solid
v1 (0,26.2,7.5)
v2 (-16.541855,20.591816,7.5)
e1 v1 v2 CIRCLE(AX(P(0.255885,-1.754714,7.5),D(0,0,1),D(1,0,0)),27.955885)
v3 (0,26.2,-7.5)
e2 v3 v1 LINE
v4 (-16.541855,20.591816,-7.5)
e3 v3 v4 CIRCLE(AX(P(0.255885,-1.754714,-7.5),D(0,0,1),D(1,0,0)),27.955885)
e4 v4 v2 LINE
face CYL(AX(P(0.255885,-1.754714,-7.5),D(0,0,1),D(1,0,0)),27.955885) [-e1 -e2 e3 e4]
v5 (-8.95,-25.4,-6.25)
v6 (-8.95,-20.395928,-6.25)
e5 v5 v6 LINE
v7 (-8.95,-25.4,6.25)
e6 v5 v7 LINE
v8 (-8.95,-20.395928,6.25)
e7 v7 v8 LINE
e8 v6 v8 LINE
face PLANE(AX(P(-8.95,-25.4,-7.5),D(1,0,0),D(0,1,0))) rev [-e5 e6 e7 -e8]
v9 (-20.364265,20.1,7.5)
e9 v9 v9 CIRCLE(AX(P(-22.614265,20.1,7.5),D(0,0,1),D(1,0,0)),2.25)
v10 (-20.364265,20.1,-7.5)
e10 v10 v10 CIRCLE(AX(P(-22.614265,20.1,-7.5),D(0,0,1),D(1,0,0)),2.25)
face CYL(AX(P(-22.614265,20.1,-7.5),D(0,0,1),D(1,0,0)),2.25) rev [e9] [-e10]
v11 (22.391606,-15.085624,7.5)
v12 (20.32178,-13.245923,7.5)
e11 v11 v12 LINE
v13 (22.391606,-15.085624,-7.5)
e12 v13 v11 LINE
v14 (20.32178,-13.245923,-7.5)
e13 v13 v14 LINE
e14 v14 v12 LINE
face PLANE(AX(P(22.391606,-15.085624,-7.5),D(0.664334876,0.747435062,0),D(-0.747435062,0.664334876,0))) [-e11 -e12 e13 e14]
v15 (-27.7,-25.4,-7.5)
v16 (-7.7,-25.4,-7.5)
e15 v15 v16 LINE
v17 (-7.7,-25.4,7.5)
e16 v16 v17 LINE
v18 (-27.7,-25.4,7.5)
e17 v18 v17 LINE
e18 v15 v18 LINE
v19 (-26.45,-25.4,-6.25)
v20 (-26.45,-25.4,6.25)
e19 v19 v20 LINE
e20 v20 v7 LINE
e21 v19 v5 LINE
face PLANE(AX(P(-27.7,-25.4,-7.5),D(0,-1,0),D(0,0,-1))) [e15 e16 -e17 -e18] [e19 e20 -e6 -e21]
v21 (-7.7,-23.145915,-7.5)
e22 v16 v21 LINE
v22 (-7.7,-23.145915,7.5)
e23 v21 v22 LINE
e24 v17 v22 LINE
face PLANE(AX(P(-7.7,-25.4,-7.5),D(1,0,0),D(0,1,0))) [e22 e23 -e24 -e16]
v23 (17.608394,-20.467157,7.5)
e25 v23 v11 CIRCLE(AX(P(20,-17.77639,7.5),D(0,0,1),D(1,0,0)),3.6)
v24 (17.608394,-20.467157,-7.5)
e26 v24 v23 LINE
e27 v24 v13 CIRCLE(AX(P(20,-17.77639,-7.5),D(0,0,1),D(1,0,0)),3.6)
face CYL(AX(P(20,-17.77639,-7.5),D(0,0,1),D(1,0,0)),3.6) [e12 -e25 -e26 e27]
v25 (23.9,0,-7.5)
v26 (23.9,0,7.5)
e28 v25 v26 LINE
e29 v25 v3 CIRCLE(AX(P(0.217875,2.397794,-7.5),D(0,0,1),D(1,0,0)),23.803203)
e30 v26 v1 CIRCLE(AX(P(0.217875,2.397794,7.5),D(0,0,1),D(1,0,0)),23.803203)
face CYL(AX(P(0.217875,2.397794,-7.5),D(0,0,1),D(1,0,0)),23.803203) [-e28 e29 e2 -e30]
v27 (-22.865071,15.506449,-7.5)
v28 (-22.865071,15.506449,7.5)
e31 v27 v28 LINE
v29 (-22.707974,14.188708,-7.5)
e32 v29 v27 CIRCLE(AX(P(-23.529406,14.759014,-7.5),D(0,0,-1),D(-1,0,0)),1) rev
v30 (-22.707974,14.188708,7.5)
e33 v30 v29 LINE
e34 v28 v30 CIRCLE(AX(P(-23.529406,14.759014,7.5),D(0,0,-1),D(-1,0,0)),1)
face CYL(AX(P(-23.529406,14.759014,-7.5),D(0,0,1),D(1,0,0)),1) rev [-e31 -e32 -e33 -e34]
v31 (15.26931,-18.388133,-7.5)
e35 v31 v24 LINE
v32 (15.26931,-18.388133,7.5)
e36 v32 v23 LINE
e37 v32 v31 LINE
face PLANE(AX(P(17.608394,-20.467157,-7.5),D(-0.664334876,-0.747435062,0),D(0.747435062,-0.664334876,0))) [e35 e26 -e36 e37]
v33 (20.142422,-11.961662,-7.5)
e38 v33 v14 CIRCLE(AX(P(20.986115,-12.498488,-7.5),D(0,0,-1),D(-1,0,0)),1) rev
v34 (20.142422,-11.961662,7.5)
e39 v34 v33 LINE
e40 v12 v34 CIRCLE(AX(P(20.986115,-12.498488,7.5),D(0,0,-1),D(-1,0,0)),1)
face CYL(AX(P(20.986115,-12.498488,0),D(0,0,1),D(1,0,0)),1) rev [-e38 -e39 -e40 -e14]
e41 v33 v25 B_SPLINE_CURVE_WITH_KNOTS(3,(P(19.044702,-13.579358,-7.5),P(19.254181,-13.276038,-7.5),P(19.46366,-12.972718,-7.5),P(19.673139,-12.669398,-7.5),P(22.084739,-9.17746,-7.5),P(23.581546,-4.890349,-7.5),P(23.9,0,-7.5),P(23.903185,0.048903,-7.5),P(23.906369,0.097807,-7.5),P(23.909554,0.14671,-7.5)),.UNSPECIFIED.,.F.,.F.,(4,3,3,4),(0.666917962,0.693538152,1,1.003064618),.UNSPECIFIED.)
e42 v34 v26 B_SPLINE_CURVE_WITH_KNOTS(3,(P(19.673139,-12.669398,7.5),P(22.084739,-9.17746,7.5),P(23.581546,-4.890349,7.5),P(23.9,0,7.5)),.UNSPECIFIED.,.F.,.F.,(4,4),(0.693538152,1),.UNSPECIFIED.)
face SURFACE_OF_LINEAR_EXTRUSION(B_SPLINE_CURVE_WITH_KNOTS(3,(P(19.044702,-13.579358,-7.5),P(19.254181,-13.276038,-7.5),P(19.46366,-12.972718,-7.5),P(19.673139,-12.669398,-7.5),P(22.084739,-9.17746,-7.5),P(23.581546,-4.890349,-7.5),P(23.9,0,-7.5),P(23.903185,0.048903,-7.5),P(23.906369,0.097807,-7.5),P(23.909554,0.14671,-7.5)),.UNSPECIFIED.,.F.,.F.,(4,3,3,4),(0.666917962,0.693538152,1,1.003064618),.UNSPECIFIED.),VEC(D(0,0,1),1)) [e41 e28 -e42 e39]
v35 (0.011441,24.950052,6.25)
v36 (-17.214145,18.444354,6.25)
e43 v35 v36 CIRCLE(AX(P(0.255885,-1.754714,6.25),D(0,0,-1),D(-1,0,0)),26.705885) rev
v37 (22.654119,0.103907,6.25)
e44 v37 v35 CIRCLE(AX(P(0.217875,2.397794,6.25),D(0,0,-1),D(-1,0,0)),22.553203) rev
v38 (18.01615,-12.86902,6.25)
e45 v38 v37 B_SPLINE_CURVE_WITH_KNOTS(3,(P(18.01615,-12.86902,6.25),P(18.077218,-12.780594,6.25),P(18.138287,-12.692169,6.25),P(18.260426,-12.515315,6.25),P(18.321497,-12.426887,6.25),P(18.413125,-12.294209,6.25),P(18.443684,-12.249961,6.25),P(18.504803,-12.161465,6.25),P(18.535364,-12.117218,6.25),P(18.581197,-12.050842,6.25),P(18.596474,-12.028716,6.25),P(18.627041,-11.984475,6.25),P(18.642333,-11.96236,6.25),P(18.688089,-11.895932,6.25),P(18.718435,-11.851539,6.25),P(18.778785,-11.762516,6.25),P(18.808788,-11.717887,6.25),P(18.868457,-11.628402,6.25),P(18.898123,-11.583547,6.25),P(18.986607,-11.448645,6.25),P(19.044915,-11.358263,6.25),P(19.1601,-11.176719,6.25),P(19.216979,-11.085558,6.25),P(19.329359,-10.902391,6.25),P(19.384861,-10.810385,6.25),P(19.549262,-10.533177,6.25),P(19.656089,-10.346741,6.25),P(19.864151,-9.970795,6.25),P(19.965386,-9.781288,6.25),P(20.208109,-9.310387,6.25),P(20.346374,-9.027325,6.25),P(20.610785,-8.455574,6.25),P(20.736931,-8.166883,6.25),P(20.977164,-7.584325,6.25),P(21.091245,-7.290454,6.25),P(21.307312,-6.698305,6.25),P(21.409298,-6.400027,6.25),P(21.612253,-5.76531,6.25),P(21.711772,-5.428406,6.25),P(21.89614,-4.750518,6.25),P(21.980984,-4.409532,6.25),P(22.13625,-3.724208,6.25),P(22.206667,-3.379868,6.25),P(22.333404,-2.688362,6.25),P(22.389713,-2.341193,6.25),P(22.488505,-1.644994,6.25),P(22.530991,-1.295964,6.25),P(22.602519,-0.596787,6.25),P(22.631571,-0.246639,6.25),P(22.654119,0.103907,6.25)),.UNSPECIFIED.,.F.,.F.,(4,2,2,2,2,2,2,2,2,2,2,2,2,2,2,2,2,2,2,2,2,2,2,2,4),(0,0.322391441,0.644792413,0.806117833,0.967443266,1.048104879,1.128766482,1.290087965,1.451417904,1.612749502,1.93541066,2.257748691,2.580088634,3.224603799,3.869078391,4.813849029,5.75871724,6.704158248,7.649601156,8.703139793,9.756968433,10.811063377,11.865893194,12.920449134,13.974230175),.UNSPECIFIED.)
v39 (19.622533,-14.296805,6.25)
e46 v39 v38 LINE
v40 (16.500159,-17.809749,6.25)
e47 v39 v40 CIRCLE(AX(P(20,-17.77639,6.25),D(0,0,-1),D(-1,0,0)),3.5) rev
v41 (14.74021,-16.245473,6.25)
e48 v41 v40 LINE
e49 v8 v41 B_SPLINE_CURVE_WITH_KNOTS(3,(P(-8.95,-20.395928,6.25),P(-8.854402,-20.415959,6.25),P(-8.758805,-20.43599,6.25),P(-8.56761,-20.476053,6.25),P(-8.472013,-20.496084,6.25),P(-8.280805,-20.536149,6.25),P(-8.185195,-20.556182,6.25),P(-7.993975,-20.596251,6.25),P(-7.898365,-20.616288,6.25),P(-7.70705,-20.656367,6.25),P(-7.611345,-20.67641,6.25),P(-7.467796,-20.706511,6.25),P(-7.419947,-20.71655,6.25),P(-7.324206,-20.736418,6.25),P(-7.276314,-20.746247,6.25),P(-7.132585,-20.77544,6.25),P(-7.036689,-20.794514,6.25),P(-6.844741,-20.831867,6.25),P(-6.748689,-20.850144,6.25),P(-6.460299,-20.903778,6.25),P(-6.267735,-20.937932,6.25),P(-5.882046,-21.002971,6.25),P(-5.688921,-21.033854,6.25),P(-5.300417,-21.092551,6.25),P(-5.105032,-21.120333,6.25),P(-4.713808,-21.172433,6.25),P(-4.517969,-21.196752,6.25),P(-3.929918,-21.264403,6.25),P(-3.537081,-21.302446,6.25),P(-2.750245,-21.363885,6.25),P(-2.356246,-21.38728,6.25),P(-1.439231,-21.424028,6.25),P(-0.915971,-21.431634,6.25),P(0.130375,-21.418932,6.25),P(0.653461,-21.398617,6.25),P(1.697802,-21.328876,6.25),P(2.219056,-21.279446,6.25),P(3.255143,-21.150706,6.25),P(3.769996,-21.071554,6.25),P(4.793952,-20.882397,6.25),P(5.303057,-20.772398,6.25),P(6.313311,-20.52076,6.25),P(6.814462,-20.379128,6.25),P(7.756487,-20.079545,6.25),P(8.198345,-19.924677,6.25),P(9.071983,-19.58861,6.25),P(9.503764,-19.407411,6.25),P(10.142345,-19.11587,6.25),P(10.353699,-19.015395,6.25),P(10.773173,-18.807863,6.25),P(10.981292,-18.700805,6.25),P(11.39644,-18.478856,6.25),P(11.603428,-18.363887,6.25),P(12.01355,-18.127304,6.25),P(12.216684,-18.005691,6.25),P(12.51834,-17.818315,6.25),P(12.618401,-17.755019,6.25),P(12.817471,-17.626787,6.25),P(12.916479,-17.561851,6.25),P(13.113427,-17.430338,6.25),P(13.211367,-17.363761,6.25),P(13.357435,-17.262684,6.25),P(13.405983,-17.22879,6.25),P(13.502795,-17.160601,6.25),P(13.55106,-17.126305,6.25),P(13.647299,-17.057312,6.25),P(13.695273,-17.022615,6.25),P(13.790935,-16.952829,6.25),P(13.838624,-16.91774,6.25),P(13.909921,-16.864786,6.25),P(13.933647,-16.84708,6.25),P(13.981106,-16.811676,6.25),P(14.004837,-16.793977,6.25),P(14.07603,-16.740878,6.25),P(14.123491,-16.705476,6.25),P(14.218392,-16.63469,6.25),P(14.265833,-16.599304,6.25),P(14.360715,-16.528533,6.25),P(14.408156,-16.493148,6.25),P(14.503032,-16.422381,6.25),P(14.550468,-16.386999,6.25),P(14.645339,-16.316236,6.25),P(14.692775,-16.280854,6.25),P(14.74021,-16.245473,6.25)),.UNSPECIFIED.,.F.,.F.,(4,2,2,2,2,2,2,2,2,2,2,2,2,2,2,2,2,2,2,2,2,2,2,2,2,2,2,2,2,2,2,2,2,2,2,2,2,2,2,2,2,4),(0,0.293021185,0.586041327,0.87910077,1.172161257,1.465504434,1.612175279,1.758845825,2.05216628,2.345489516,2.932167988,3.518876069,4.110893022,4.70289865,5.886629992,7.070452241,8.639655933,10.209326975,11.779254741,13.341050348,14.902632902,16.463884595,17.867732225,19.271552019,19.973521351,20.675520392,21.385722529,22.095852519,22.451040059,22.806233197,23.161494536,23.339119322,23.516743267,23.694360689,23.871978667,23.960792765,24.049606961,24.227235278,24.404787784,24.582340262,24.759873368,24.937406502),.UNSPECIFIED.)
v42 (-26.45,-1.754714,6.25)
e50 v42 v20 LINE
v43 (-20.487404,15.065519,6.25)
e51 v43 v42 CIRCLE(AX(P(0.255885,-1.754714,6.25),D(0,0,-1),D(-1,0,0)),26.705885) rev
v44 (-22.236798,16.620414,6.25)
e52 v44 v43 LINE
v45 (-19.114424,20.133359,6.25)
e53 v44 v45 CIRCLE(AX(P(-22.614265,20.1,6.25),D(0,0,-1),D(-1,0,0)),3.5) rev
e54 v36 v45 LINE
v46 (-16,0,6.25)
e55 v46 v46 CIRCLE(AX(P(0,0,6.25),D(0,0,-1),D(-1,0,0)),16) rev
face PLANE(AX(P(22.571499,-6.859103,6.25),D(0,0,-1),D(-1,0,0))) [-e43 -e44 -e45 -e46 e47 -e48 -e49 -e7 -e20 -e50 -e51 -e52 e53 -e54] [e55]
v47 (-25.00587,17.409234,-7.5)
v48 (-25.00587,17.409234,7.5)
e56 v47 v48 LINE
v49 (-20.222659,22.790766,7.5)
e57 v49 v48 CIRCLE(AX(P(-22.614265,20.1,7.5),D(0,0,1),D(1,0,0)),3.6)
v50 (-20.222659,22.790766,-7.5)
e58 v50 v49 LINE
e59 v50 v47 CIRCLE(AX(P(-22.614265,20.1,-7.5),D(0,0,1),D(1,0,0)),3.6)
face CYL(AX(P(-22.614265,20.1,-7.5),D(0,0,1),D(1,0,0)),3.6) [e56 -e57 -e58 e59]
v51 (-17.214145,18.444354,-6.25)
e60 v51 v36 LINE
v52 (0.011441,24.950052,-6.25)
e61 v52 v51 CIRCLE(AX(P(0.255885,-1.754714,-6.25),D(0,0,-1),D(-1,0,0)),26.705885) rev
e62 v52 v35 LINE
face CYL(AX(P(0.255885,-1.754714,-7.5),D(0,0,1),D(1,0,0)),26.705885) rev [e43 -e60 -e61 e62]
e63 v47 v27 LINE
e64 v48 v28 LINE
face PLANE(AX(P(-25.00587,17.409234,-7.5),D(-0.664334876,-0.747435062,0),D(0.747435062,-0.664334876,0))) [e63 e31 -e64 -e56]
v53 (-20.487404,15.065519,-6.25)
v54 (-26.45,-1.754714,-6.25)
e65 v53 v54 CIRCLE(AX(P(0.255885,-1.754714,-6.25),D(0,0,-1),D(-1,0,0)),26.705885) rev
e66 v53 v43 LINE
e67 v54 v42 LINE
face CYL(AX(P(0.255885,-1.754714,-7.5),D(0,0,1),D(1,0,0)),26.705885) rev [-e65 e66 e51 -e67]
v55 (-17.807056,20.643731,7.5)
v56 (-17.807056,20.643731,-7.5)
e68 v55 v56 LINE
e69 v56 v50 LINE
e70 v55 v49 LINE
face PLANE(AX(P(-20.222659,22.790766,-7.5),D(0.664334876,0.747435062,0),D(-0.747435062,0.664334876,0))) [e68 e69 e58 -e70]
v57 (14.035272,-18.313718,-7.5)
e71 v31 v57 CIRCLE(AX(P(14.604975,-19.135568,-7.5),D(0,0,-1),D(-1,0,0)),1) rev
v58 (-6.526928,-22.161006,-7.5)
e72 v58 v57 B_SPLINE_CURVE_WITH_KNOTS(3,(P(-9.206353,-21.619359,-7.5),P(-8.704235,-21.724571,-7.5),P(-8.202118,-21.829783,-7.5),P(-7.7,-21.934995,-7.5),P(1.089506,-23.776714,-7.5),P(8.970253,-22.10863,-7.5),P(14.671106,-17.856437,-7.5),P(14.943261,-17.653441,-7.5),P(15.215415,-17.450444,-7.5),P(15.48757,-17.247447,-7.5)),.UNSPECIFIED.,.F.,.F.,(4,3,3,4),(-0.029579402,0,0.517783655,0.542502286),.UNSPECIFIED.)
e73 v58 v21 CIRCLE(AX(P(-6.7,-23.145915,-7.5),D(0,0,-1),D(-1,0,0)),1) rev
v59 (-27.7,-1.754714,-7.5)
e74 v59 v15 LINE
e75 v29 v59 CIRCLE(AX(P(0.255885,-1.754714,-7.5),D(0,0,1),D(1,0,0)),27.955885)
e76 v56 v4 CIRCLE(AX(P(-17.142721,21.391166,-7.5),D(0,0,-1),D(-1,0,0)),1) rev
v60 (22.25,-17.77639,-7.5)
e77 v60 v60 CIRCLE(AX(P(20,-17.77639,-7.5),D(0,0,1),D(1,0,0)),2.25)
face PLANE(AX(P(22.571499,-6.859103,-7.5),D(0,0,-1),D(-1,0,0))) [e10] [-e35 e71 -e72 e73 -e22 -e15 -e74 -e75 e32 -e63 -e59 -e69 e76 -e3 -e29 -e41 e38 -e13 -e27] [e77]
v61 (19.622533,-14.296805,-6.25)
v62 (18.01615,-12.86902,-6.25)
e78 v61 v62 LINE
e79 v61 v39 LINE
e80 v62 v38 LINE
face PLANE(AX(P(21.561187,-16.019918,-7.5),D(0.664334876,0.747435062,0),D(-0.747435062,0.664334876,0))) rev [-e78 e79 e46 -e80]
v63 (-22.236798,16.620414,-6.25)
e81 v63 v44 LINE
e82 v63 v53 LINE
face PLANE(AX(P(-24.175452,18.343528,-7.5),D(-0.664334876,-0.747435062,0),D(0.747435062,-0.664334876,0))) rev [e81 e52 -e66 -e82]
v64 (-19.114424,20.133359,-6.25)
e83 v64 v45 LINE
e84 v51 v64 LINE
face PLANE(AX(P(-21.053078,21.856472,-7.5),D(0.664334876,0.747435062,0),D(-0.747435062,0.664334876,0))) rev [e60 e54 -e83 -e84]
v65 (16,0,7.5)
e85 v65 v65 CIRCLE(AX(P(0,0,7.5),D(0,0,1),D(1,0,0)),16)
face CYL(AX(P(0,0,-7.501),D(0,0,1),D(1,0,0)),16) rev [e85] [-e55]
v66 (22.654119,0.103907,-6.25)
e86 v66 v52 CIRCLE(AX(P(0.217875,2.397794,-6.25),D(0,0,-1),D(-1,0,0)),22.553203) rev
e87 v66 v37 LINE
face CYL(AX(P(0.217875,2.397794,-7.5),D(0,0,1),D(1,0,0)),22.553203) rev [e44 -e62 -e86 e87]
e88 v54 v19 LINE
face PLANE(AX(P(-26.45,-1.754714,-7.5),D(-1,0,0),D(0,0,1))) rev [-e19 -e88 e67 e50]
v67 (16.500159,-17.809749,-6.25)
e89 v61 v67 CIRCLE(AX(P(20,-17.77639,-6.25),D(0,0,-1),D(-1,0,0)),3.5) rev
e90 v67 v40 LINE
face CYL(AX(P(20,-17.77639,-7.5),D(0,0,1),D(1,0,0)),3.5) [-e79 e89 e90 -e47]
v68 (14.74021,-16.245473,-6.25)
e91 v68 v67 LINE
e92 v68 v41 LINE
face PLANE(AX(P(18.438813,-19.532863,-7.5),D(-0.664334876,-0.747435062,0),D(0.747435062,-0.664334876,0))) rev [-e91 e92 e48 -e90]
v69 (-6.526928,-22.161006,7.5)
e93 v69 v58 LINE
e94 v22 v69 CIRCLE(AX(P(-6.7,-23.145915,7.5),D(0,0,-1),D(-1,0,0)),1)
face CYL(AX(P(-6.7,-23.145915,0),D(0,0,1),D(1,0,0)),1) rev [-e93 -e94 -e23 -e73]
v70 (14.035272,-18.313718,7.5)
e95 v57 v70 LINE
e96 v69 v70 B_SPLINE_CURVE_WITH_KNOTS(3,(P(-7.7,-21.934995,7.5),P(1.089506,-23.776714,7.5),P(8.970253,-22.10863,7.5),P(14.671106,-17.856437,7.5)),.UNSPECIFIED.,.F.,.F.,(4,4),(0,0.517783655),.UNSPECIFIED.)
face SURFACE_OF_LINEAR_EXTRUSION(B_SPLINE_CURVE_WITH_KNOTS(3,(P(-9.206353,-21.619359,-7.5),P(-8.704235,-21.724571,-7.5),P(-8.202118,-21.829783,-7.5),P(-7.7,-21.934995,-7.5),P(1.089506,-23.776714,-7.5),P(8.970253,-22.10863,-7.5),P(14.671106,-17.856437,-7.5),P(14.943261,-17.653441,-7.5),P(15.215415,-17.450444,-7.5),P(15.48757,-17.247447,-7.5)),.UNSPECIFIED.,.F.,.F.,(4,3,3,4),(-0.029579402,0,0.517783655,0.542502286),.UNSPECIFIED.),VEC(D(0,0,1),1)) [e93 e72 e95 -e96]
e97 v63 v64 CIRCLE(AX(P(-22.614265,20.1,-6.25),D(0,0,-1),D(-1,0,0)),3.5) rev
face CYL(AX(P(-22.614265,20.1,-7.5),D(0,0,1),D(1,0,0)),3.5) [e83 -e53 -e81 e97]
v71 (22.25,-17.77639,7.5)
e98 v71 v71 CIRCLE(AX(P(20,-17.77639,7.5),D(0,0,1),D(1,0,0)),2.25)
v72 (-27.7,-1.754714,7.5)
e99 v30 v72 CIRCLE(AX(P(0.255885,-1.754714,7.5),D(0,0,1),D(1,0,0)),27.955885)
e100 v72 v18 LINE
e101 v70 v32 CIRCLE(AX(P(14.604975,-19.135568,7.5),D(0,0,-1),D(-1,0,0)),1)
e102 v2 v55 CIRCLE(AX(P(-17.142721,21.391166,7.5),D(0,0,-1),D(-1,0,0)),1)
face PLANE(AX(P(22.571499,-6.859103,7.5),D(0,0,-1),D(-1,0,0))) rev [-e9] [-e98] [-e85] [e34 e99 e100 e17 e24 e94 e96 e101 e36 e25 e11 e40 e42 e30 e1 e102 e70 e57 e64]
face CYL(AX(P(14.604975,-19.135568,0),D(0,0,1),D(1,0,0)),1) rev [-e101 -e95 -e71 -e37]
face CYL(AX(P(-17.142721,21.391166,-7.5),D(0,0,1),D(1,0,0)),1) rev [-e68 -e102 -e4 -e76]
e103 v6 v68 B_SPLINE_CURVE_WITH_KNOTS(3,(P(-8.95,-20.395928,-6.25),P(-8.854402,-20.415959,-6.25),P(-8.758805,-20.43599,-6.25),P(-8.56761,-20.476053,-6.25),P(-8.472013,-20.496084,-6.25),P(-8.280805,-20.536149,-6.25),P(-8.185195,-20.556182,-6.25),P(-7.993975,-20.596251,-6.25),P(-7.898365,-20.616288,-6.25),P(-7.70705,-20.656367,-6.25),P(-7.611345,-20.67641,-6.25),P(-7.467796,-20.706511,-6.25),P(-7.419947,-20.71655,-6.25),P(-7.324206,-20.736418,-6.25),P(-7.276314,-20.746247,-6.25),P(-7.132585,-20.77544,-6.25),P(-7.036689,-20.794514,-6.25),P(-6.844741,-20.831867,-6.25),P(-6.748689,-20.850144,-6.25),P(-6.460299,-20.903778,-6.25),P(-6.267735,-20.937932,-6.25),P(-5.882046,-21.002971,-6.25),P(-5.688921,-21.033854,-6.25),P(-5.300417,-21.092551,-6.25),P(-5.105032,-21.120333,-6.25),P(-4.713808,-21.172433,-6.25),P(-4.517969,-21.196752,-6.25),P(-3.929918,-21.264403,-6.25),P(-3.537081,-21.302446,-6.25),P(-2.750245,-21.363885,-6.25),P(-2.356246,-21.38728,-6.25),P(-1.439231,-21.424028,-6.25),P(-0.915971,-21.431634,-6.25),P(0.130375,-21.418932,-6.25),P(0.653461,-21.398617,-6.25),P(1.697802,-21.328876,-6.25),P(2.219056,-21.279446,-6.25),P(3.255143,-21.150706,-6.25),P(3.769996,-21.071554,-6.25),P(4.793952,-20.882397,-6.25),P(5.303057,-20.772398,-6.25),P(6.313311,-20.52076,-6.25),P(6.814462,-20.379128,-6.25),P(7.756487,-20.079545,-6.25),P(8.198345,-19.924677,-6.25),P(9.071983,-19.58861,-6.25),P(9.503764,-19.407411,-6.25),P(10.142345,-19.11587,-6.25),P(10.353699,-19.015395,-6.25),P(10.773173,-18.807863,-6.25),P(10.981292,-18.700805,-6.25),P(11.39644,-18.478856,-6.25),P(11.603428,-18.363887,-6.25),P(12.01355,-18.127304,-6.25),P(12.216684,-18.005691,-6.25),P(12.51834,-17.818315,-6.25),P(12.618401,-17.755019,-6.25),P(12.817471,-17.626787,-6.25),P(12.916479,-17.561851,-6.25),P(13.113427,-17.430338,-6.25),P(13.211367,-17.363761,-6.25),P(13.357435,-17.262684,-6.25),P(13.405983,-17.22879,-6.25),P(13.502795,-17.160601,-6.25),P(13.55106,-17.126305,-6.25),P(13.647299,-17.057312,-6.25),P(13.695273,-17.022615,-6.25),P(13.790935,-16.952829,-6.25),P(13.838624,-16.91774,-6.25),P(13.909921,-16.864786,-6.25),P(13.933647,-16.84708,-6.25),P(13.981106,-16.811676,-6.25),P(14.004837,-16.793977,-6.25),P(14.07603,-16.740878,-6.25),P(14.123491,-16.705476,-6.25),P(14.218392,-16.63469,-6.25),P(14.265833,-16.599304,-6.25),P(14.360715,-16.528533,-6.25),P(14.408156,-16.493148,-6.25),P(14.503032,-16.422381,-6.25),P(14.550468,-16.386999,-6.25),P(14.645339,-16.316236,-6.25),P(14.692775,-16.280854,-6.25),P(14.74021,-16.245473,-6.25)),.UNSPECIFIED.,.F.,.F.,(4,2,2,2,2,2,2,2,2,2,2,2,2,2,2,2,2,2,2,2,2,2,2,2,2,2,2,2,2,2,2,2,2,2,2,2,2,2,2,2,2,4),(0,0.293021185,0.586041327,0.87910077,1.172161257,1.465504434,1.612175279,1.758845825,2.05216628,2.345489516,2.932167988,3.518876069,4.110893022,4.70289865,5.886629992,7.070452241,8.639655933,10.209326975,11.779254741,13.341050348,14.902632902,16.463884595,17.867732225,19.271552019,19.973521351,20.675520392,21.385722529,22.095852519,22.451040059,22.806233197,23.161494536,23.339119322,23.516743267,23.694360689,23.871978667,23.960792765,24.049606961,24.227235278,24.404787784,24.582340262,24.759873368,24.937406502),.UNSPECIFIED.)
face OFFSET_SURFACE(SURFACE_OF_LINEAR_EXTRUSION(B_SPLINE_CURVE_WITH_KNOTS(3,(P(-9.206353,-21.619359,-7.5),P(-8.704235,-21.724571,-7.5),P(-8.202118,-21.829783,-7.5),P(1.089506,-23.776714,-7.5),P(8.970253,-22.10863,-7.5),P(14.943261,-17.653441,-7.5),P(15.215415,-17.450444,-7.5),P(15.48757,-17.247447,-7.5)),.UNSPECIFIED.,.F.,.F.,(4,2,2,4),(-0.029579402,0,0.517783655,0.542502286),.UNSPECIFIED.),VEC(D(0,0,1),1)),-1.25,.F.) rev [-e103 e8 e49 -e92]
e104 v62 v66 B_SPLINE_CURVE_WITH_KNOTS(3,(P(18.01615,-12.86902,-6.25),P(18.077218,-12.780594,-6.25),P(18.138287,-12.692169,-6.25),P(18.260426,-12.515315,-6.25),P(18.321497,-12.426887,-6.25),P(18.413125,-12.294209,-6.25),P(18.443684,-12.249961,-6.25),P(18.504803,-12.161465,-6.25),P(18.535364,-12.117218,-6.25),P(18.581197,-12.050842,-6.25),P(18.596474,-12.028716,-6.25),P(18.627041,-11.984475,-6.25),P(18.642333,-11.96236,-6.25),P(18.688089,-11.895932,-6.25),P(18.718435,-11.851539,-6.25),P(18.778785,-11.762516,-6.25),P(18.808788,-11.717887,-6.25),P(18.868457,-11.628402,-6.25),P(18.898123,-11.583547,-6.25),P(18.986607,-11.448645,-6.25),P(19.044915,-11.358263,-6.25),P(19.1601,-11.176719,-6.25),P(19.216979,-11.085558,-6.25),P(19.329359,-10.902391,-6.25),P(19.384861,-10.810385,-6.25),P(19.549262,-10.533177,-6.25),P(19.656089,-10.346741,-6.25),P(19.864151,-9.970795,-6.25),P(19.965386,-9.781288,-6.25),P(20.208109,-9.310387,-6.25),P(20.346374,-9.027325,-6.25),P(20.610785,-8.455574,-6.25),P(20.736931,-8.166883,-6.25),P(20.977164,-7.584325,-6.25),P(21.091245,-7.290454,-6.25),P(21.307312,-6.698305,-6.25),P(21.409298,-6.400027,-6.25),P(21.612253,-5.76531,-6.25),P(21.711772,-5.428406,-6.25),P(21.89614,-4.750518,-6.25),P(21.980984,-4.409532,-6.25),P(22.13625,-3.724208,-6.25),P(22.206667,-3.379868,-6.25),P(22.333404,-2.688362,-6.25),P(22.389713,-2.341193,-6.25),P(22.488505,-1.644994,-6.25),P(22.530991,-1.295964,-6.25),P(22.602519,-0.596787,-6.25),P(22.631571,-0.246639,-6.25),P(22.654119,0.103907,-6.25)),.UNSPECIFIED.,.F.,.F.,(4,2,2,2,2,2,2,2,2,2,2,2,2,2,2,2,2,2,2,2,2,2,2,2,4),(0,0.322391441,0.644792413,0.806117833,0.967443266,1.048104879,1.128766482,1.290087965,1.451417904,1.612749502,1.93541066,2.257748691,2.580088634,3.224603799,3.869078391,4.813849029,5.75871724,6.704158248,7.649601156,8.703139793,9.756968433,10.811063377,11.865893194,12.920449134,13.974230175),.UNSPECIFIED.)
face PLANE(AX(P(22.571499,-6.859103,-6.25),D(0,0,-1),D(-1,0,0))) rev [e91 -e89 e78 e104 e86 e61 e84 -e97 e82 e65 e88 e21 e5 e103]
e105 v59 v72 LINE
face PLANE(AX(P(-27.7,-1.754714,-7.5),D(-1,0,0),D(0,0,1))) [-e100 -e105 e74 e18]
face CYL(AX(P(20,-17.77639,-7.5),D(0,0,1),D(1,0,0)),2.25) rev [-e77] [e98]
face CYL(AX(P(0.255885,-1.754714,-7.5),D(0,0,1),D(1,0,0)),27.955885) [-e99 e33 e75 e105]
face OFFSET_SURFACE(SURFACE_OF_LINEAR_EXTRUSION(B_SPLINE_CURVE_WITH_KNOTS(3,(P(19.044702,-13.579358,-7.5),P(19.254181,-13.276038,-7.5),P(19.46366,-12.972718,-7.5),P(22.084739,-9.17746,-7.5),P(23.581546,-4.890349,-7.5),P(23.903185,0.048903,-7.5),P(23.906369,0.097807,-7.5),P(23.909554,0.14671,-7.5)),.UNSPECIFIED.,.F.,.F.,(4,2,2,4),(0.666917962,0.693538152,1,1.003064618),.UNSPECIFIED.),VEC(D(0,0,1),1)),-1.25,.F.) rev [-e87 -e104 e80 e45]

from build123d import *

# Parameters (mm, degrees)
BOSS_EXTRUDE1_DEPTH      = 7.5
BOSS_EXTRUDE1_DEPTH_BACK = 7.5
SKETCH2_R                = 2.25
SHELL1_START             = -6.25
SHELL1_DEPTH             = 12.5
CUT_EXTRUDE1_REACH       = 42.973
SKETCH3_R                = 16
FILLET1_R                = 1


# Read off the part's stored shape, not the designer's step: Shell1
with BuildPart() as part:
    # Sketch2 → Boss-Extrude1 (new, two sides: drawn at the far end of the back side and taken through both)
    with BuildSketch(Plane.XY.offset(-BOSS_EXTRUDE1_DEPTH_BACK)):
        with BuildLine():
            Line((-27.7, -1.754714302), (-27.7, -25.4))
            Line((-27.7, -25.4), (-7.7, -25.4))
            Line((-7.7, -25.4), (-7.7, -21.934994614))
            add(Edge.make_bspline(
                [(-7.7, -21.934994614), (1.089505829, -23.776714198), (8.970252681, -22.10862964), (14.671105933, -17.856437337)],
                knots=[0, 0, 0, 0, 0.517783655, 0.517783655, 0.517783655, 0.517783655], degree=3))
            Line((14.671105933, -17.856437337), (17.608394445, -20.467156716))
            ThreePointArc((17.608394445, -20.467156716), (22.690766223, -20.167996048), (22.391605555, -15.085624269))
            Line((22.391605555, -15.085624269), (19.673138844, -12.669397979))
            add(Edge.make_bspline(
                [(19.673138844, -12.669397979), (22.084739228, -9.177460006), (23.581545529, -4.890349215), (23.9, 0)],
                knots=[0.693538152, 0.693538152, 0.693538152, 0.693538152, 1, 1, 1, 1], degree=3))
            ThreePointArc((23.9, 0), (17.803458828, 18.439605572), (0, 26.2))
            ThreePointArc((0, 26.2), (-9.105433904, 24.587214818), (-17.186614263, 20.092270255))
            Line((-17.186614263, 20.092270255), (-20.222659144, 22.790766223))
            ThreePointArc((-20.222659144, 22.790766223), (-25.305030923, 22.491605555), (-25.005870255, 17.409233777))
            Line((-25.005870255, 17.409233777), (-22.191609365, 14.907863751))
            ThreePointArc((-22.191609365, 14.907863751), (-26.28720334, 7.020020377), (-27.7, -1.754714302))
        make_face()
        with Locations((20, -17.776390493)):
            Circle(SKETCH2_R, mode=Mode.SUBTRACT)
        with Locations((-22.6142647, 20.1)):
            Circle(SKETCH2_R, mode=Mode.SUBTRACT)
    extrude(amount=BOSS_EXTRUDE1_DEPTH + BOSS_EXTRUDE1_DEPTH_BACK)

    # Shell1 outline → Shell1 (cut)
    with BuildSketch(Plane.XY.offset(SHELL1_START)):
        with BuildLine():
            Line((19.622532896, -14.296804513), (18.016150224, -12.869020231))
            add(Edge.make_bspline(
                [(18.016150224, -12.869020231), (18.051576945, -12.817723211), (18.087003667, -12.766426191), (18.122430388, -12.715129171), (18.157857109, -12.66383215), (18.193283831, -12.612535131), (18.228710551, -12.56123811), (18.264137274, -12.50994109), (18.299563994, -12.45864407), (18.334990716, -12.40734705), (18.370417437, -12.35605003), (18.405844159, -12.30475301), (18.44127088, -12.25345599), (18.476697601, -12.20215897), (18.520981003, -12.138037694), (18.529837683, -12.125213439), (18.538694363, -12.112389184), (18.547551044, -12.099564929), (18.556407724, -12.086740674), (18.565264404, -12.073916419), (18.574121085, -12.061092164), (18.582977765, -12.048267909), (18.591834446, -12.035443654), (18.600691126, -12.022619399), (18.609547806, -12.009795144), (18.618404486, -11.996970889), (18.627261167, -11.984146634), (18.636671389, -11.970520863), (18.637224932, -11.969719347), (18.637778474, -11.968917831), (18.638332017, -11.968116315), (18.638885559, -11.967314799), (18.639439102, -11.966513284), (18.639992644, -11.965711767), (18.640546187, -11.964910252), (18.64109973, -11.964108735), (18.641653272, -11.96330722), (18.642206815, -11.962505704), (18.642760357, -11.961704188), (18.6433139, -11.960902672), (18.643936635, -11.960000966), (18.644007721, -11.959898036), (18.644065014, -11.959815075), (18.644167659, -11.959666454), (18.644187428, -11.959637822), (18.644283855, -11.9594982), (18.644383013, -11.959354625), (18.644395371, -11.959336729), (18.644469199, -11.959229822), (18.644608909, -11.959027533), (18.644602592, -11.959036679), (18.644696049, -11.958901353), (18.644756897, -11.958813245), (18.644887565, -11.958624032), (18.644952899, -11.958529425), (18.645018233, -11.958434817), (18.645083566, -11.958340209), (18.645148897, -11.958245601), (18.64521423, -11.958150993), (18.64527956, -11.958056383), (18.645344892, -11.957961774), (18.645410222, -11.957867163), (18.645475552, -11.957772553), (18.645540881, -11.957677942), (18.64560621, -11.957583331), (18.645671538, -11.957488719), (18.645867521, -11.957204882), (18.645998175, -11.957015655), (18.646128827, -11.956826427), (18.646259476, -11.956637197), (18.646390124, -11.956447965), (18.646520768, -11.956258731), (18.646651413, -11.956069496), (18.646782053, -11.955880258), (18.646912693, -11.95569102), (18.64704333, -11.955501779), (18.647173965, -11.955312536), (18.647304598, -11.955123292), (18.64743523, -11.954934045), (18.647827117, -11.954366301), (18.648088368, -11.953987798), (18.64834961, -11.953609287), (18.648610844, -11.95323077), (18.648872069, -11.952852245), (18.649133288, -11.952473713), (18.649394497, -11.952095174), (18.649655699, -11.951716627), (18.649916892, -11.951338074), (18.650178078, -11.950959513), (18.650439255, -11.950580945), (18.650700424, -11.95020237), (18.650961585, -11.949823787), (18.65226735, -11.947930839), (18.653311833, -11.946416366), (18.654356185, -11.944901777), (18.655400408, -11.943387074), (18.656444501, -11.941872255), (18.657488465, -11.940357322), (18.658532298, -11.938842273), (18.659576002, -11.937327109), (18.660619576, -11.93581183), (18.661663021, -11.934296437), (18.662706335, -11.932780928), (18.66374952, -11.931265304), (18.664792575, -11.929749565), (18.667921351, -11.925202003), (18.670006683, -11.922169835), (18.672091495, -11.919137207), (18.674175788, -11.916104119), (18.676259561, -11.913070571), (18.678342816, -11.910036563), (18.680425551, -11.907002096), (18.682507767, -11.903967167), (18.684589463, -11.90093178), (18.68667064, -11.897895932), (18.688751296, -11.894859625), (18.690831434, -11.891822858), (18.692911052, -11.888785631), (18.699148345, -11.879672571), (18.703304462, -11.873595358), (18.7074585, -11.867516307), (18.711610458, -11.861435418), (18.715760335, -11.85535269), (18.719908132, -11.849268125), (18.724053848, -11.843181721), (18.728197483, -11.83709348), (18.732339035, -11.831003402), (18.736478506, -11.824911486), (18.740615894, -11.818817734), (18.744751199, -11.812722145), (18.748884421, -11.80662472), (18.769540109, -11.776128414), (18.786031319, -11.751701992), (18.802489161, -11.727246206), (18.818913609, -11.702761073), (18.835304639, -11.678246607), (18.851662221, -11.653702823), (18.867986333, -11.629129738), (18.884276945, -11.604527363), (18.900534033, -11.579895716), (18.91675757, -11.555234811), (18.932947531, -11.530544664), (18.949103888, -11.505825288), (18.965226617, -11.4810767), (19.04567198, -11.357187769), (19.10948985, -11.25760948), (19.172767579, -11.157564989), (19.235503448, -11.057055241), (19.297695737, -10.956081176), (19.359342728, -10.85464374), (19.420442701, -10.752743874), (19.480993936, -10.650382523), (19.540994714, -10.547560629), (19.600443315, -10.444279135), (19.659338021, -10.340538985), (19.717677112, -10.236341121), (19.775458869, -10.131686486), (19.947126977, -9.816355101), (20.059335888, -9.604310842), (20.16929426, -9.390450666), (20.276987945, -9.174781998), (20.382402688, -8.957312267), (20.485524131, -8.738048908), (20.586337811, -8.516999358), (20.684829159, -8.294171063), (20.780983502, -8.06957147), (20.874786063, -7.843208033), (20.966221959, -7.61508821), (21.055276202, -7.385219464), (21.1419337, -7.153609263), (21.310424813, -6.686920896), (21.392258464, -6.45184282), (21.471664997, -6.215038335), (21.548629109, -5.976514973), (21.623135411, -5.736280308), (21.695168429, -5.494341964), (21.764712594, -5.250707611), (21.831752262, -5.005384963), (21.896271688, -4.758381783), (21.958255052, -4.50970588), (22.017686437, -4.259365107), (22.074549845, -4.007367366), (22.128829187, -3.753720604), (22.20634784, -3.370788921), (22.231537383, -3.242734734), (22.256074879, -3.114271279), (22.279958285, -2.985399584), (22.30318556, -2.856120672), (22.325754665, -2.726435571), (22.347663554, -2.596345306), (22.368910193, -2.465850903), (22.389492535, -2.334953386), (22.409408542, -2.203653784), (22.428656171, -2.07195312), (22.447233383, -1.939852421), (22.465138135, -1.807352712), (22.490983513, -1.608006173), (22.499430005, -1.54145784), (22.507707606, -1.474810151), (22.515816054, -1.408063241), (22.523755093, -1.341217241), (22.531524462, -1.274272285), (22.539123905, -1.207228504), (22.546553159, -1.140086033), (22.553811969, -1.072845002), (22.560900073, -1.005505546), (22.567817215, -0.938067797), (22.574563135, -0.870531887), (22.581137573, -0.80289795), (22.590741621, -0.701300201), (22.593900035, -0.667409811), (22.597015481, -0.633494965), (22.600087926, -0.59955568), (22.603117338, -0.565591972), (22.606103685, -0.531603859), (22.609046934, -0.497591356), (22.611947051, -0.463554482), (22.614804006, -0.429493253), (22.617617765, -0.395407686), (22.620388296, -0.361297797), (22.623115565, -0.327163604), (22.625799541, -0.293005124), (22.629760517, -0.241730997), (22.63107001, -0.224633554), (22.632368668, -0.207530045), (22.633656487, -0.190420473), (22.63493346, -0.17330484), (22.636199589, -0.156183147), (22.637454861, -0.139055398), (22.638699282, -0.121921594), (22.639932839, -0.104781737), (22.641155535, -0.087635829), (22.64236736, -0.070483873), (22.643568315, -0.053325871), (22.644758392, -0.036161825), (22.646232388, -0.014699214), (22.646526508, -0.010406314), (22.646819947, -0.006113037), (22.647112705, -0.001819382), (22.647404785, 0.00247465), (22.647696182, 0.00676906), (22.647986902, 0.011063848), (22.648276938, 0.015359013), (22.648566297, 0.019654555), (22.648854972, 0.023950474), (22.649142969, 0.028246771), (22.649430284, 0.032543446), (22.649716919, 0.036840497), (22.65014585, 0.04328664), (22.650288657, 0.045435449), (22.650431293, 0.047584352), (22.65057376, 0.049733349), (22.650716055, 0.051882441), (22.650858182, 0.054031626), (22.651000137, 0.056180907), (22.651141923, 0.058330281), (22.651283537, 0.06047975), (22.651424983, 0.062629313), (22.651566257, 0.06477897), (22.651707361, 0.066928721), (22.651848295, 0.069078567), (22.65202425, 0.071765992), (22.65205943, 0.072303483), (22.6520946, 0.07284098), (22.652129759, 0.073378482), (22.652164908, 0.073915991), (22.652200045, 0.074453505), (22.652235173, 0.074991026), (22.652270288, 0.075528552), (22.652305395, 0.076066084), (22.652340489, 0.076603622), (22.652375574, 0.077141166), (22.652410648, 0.077678716), (22.652445711, 0.078216272), (22.652489527, 0.078888224), (22.652498289, 0.079022614), (22.652507051, 0.079157006), (22.652515812, 0.079291397), (22.652524573, 0.079425789), (22.652533332, 0.079560181), (22.652542092, 0.079694574), (22.65255085, 0.079828967), (22.652559608, 0.07996336), (22.652568365, 0.080097754), (22.652577122, 0.080232148), (22.652585877, 0.080366542), (22.652594633, 0.080500937), (22.652612142, 0.080769727), (22.652621626, 0.080915337), (22.652624364, 0.080957354), (22.652656726, 0.081454433), (22.652609826, 0.080733725), (22.652702072, 0.08215146), (22.652629159, 0.081030098), (22.652694632, 0.082037175), (22.652676876, 0.081763348), (22.65269448, 0.082034275), (22.652702142, 0.082151727), (22.652711317, 0.082292672), (22.652720479, 0.08243336), (22.65274789, 0.082854297), (22.652766164, 0.083134921), (22.652784438, 0.083415546), (22.652802712, 0.08369617), (22.652820985, 0.083976794), (22.652839261, 0.084257419), (22.652857533, 0.084538043), (22.652875809, 0.084818668), (22.652894081, 0.085099292), (22.652912356, 0.085379917), (22.652930629, 0.085660541), (22.652948904, 0.085941166), (22.652967178, 0.08622179), (22.653058548, 0.087624912), (22.653131643, 0.08874741), (22.653204739, 0.089869908), (22.653277835, 0.090992406), (22.653350932, 0.092114904), (22.653424026, 0.093237402), (22.653497124, 0.094359899), (22.653570218, 0.095482397), (22.653643315, 0.096604895), (22.65371641, 0.097727393), (22.653789507, 0.098849891), (22.653862602, 0.099972389), (22.653935698, 0.101094887), (22.654016655, 0.102338098), (22.654024516, 0.102458811), (22.654032376, 0.102579524), (22.654040237, 0.102700237), (22.654048098, 0.10282095), (22.654055958, 0.102941663), (22.654063819, 0.103062376), (22.65407168, 0.103183089), (22.654079541, 0.103303803), (22.654087401, 0.103424516), (22.654095262, 0.103545229), (22.654103123, 0.103665942), (22.654110983, 0.103786655), (22.654118844, 0.103907368)],
                knots=[0.666917962, 0.666917962, 0.666917962, 0.666917962, 0.666917962, 0.666917962, 0.666917962, 0.666917962, 0.666917962, 0.666917962, 0.666917962, 0.666917962, 0.666917962, 0.666917962, 0.666917962, 0.687927128, 0.687927128, 0.687927128, 0.687927128, 0.687927128, 0.687927128, 0.687927128, 0.687927128, 0.687927128, 0.687927128, 0.687927128, 0.687927128, 0.687927128, 0.693179419, 0.693179419, 0.693179419, 0.693179419, 0.693179419, 0.693179419, 0.693179419, 0.693179419, 0.693179419, 0.693179419, 0.693179419, 0.693179419, 0.693179419, 0.693507688, 0.693507688, 0.693507688, 0.693507688, 0.693507688, 0.693507688, 0.693507688, 0.693507688, 0.693507688, 0.693507688, 0.693507688, 0.693507688, 0.693507688, 0.693548721, 0.693548721, 0.693548721, 0.693548721, 0.693548721, 0.693548721, 0.693548721, 0.693548721, 0.693548721, 0.693548721, 0.693548721, 0.693548721, 0.693548721, 0.693589755, 0.693589755, 0.693589755, 0.693589755, 0.693589755, 0.693589755, 0.693589755, 0.693589755, 0.693589755, 0.693589755, 0.693589755, 0.693589755, 0.693589755, 0.693671822, 0.693671822, 0.693671822, 0.693671822, 0.693671822, 0.693671822, 0.693671822, 0.693671822, 0.693671822, 0.693671822, 0.693671822, 0.693671822, 0.693671822, 0.693835956, 0.693835956, 0.693835956, 0.693835956, 0.693835956, 0.693835956, 0.693835956, 0.693835956, 0.693835956, 0.693835956, 0.693835956, 0.693835956, 0.693835956, 0.694492492, 0.694492492, 0.694492492, 0.694492492, 0.694492492, 0.694492492, 0.694492492, 0.694492492, 0.694492492, 0.694492492, 0.694492492, 0.694492492, 0.694492492, 0.695805565, 0.695805565, 0.695805565, 0.695805565, 0.695805565, 0.695805565, 0.695805565, 0.695805565, 0.695805565, 0.695805565, 0.695805565, 0.695805565, 0.695805565, 0.698431711, 0.698431711, 0.698431711, 0.698431711, 0.698431711, 0.698431711, 0.698431711, 0.698431711, 0.698431711, 0.698431711, 0.698431711, 0.698431711, 0.698431711, 0.708936294, 0.708936294, 0.708936294, 0.708936294, 0.708936294, 0.708936294, 0.708936294, 0.708936294, 0.708936294, 0.708936294, 0.708936294, 0.708936294, 0.708936294, 0.750954626, 0.750954626, 0.750954626, 0.750954626, 0.750954626, 0.750954626, 0.750954626, 0.750954626, 0.750954626, 0.750954626, 0.750954626, 0.750954626, 0.750954626, 0.83499129, 0.83499129, 0.83499129, 0.83499129, 0.83499129, 0.83499129, 0.83499129, 0.83499129, 0.83499129, 0.83499129, 0.83499129, 0.83499129, 0.83499129, 0.919027954, 0.919027954, 0.919027954, 0.919027954, 0.919027954, 0.919027954, 0.919027954, 0.919027954, 0.919027954, 0.919027954, 0.919027954, 0.919027954, 0.919027954, 0.961046286, 0.961046286, 0.961046286, 0.961046286, 0.961046286, 0.961046286, 0.961046286, 0.961046286, 0.961046286, 0.961046286, 0.961046286, 0.961046286, 0.961046286, 0.982055452, 0.982055452, 0.982055452, 0.982055452, 0.982055452, 0.982055452, 0.982055452, 0.982055452, 0.982055452, 0.982055452, 0.982055452, 0.982055452, 0.982055452, 0.992560035, 0.992560035, 0.992560035, 0.992560035, 0.992560035, 0.992560035, 0.992560035, 0.992560035, 0.992560035, 0.992560035, 0.992560035, 0.992560035, 0.992560035, 0.997812327, 0.997812327, 0.997812327, 0.997812327, 0.997812327, 0.997812327, 0.997812327, 0.997812327, 0.997812327, 0.997812327, 0.997812327, 0.997812327, 0.997812327, 0.9991254, 0.9991254, 0.9991254, 0.9991254, 0.9991254, 0.9991254, 0.9991254, 0.9991254, 0.9991254, 0.9991254, 0.9991254, 0.9991254, 0.9991254, 0.999781936, 0.999781936, 0.999781936, 0.999781936, 0.999781936, 0.999781936, 0.999781936, 0.999781936, 0.999781936, 0.999781936, 0.999781936, 0.999781936, 0.999781936, 0.99994607, 0.99994607, 0.99994607, 0.99994607, 0.99994607, 0.99994607, 0.99994607, 0.99994607, 0.99994607, 0.99994607, 0.99994607, 0.99994607, 0.99994607, 0.999987104, 0.999987104, 0.999987104, 0.999987104, 0.999987104, 0.999987104, 0.999987104, 0.999987104, 0.999987104, 0.999987104, 0.999987104, 0.999987104, 0.999987104, 1.000028137, 1.000028137, 1.000028137, 1.000028137, 1.000028137, 1.000028137, 1.000028137, 1.000028137, 1.000028137, 1.000028137, 1.000028137, 1.000028137, 1.000028137, 1.000110205, 1.000110205, 1.000110205, 1.000110205, 1.000110205, 1.000110205, 1.000110205, 1.000110205, 1.000110205, 1.000110205, 1.000110205, 1.000110205, 1.000110205, 1.000438473, 1.000438473, 1.000438473, 1.000438473, 1.000438473, 1.000438473, 1.000438473, 1.000438473, 1.000438473, 1.000438473, 1.000438473, 1.000438473, 1.000438473, 1.000473775, 1.000473775, 1.000473775, 1.000473775, 1.000473775, 1.000473775, 1.000473775, 1.000473775, 1.000473775, 1.000473775, 1.000473775, 1.000473775, 1.000473775, 1.000473775, 1.000473775], degree=14))
            ThreePointArc((22.654118844, 0.103907368), (16.887423541, 17.589012543), (0.011441482, 24.950052364))
            ThreePointArc((0.011441482, 24.950052364), (-9.179774467, 23.228732983), (-17.214144884, 18.44435392))
            Line((-17.214144884, 18.44435392), (-19.114423676, 20.133358812))
            ThreePointArc((-19.114423676, 20.133358812), (-19.998241983, 17.774827932), (-22.236797596, 16.620414021))
            Line((-22.236797596, 16.620414021), (-20.48740424, 15.06551905))
            ThreePointArc((-20.48740424, 15.06551905), (-24.915251155, 7.168188788), (-26.45, -1.754714302))
            Line((-26.45, -1.754714302), (-26.45, -25.4))
            Line((-26.45, -25.4), (-8.95, -25.4))
            Line((-8.95, -25.4), (-8.95, -20.395928254))
            add(Edge.make_bspline(
                [(-8.95, -20.395928254), (-8.879967103, -20.41060268), (-8.809934206, -20.425277107), (-8.739901309, -20.439951533), (-8.669868412, -20.45462596), (-8.599835515, -20.469300386), (-8.529802618, -20.483974813), (-8.459769721, -20.498649239), (-8.389736824, -20.513323666), (-8.319703927, -20.527998093), (-8.24967103, -20.542672519), (-8.179638133, -20.557346946), (-8.109605236, -20.572021373), (-8.00455589, -20.594033012), (-7.969539442, -20.601370226), (-7.934522993, -20.608707439), (-7.899506544, -20.616044652), (-7.864490096, -20.623381866), (-7.829473647, -20.630719079), (-7.794457199, -20.638056292), (-7.75944075, -20.645393505), (-7.724424302, -20.652730719), (-7.689407853, -20.660067932), (-7.654391405, -20.667405145), (-7.619374956, -20.674742359), (-7.575604396, -20.683913875), (-7.566850284, -20.685748179), (-7.558096171, -20.687582482), (-7.549342059, -20.689416785), (-7.540587947, -20.691251089), (-7.531833835, -20.693085392), (-7.523079723, -20.694919695), (-7.514325611, -20.696753999), (-7.505571499, -20.698588302), (-7.496817387, -20.700422605), (-7.488063274, -20.702256908), (-7.479309162, -20.704091212), (-7.469460786, -20.706154803), (-7.468366522, -20.706384091), (-7.467272258, -20.706613379), (-7.466177994, -20.706842667), (-7.46508373, -20.707071955), (-7.463989466, -20.707301243), (-7.462895202, -20.707530531), (-7.461800938, -20.707759818), (-7.460706674, -20.707989106), (-7.45961241, -20.708218394), (-7.458518146, -20.708447682), (-7.457423882, -20.70867697), (-7.455782486, -20.709020902), (-7.455235354, -20.709135546), (-7.454688222, -20.70925019), (-7.45414109, -20.709364834), (-7.453593958, -20.709479478), (-7.453046826, -20.709594122), (-7.452499694, -20.709708766), (-7.451952562, -20.70982341), (-7.45140543, -20.709938054), (-7.450858298, -20.710052698), (-7.450311166, -20.710167342), (-7.449764034, -20.710281986), (-7.448943336, -20.710453951), (-7.44866977, -20.710511273), (-7.448396204, -20.710568595), (-7.448122638, -20.710625917), (-7.447849072, -20.710683239), (-7.447575506, -20.710740561), (-7.44730194, -20.710797883), (-7.447028374, -20.710855205), (-7.446754808, -20.710912527), (-7.446481242, -20.710969849), (-7.446207676, -20.711027171), (-7.44593411, -20.711084493), (-7.445523761, -20.711170476), (-7.445386978, -20.711199137), (-7.445250195, -20.711227798), (-7.445113412, -20.711256459), (-7.444976629, -20.71128512), (-7.444839846, -20.711313781), (-7.444703063, -20.711342442), (-7.44456628, -20.711371103), (-7.444429497, -20.711399764), (-7.444292714, -20.711428425), (-7.444155931, -20.711457086), (-7.444019148, -20.711485747), (-7.443745582, -20.711543069), (-7.443605589, -20.711572403), (-7.443475817, -20.711599595), (-7.443347829, -20.711626412), (-7.443215786, -20.711654079), (-7.44308089, -20.711682342), (-7.442947139, -20.711710365), (-7.442816245, -20.711737789), (-7.44268608, -20.71176506), (-7.442553546, -20.711792827), (-7.44241929, -20.711820953), (-7.442288176, -20.711848421), (-7.440040957, -20.712319196), (-7.437925972, -20.712762124), (-7.43581103, -20.713204901), (-7.433696133, -20.713647524), (-7.431581279, -20.714089994), (-7.42946647, -20.714532312), (-7.427351704, -20.714974476), (-7.425236983, -20.715416488), (-7.423122306, -20.715858347), (-7.421007673, -20.716300053), (-7.418893084, -20.716741607), (-7.41677854, -20.717183007), (-7.410435038, -20.71850675), (-7.406206213, -20.719388634), (-7.401977564, -20.720269907), (-7.397749093, -20.721150569), (-7.393520797, -20.722030619), (-7.389292679, -20.722910059), (-7.385064737, -20.723788887), (-7.380836972, -20.724667105), (-7.376609384, -20.725544711), (-7.372381972, -20.726421706), (-7.368154737, -20.727298091), (-7.36392768, -20.728173864), (-7.342793275, -20.732549677), (-7.325888583, -20.736040554), (-7.308986725, -20.739521659), (-7.292087703, -20.742992996), (-7.27519152, -20.746454565), (-7.25829818, -20.749906371), (-7.241407684, -20.753348414), (-7.224520036, -20.756780698), (-7.207635238, -20.760203225), (-7.190753293, -20.763615997), (-7.173874204, -20.767019017), (-7.156997974, -20.770412287), (-7.005137653, -20.800863985), (-6.870333839, -20.827308309), (-6.735714564, -20.853129997), (-6.601281224, -20.878330267), (-6.467035219, -20.902910335), (-6.332977948, -20.926871418), (-6.199110809, -20.950214732), (-6.065435201, -20.972941495), (-5.931952523, -20.995052923), (-5.798664173, -21.016550234), (-5.665571549, -21.037434643), (-5.532676052, -21.057707367), (-5.134585132, -21.116694138), (-4.869985217, -21.153576784), (-4.606190462, -21.188027311), (-4.343211966, -21.220055469), (-4.081060795, -21.249671005), (-3.819747989, -21.27688367), (-3.559284555, -21.301703209), (-3.299681472, -21.324139372), (-3.040949689, -21.344201906), (-2.783100124, -21.361900558), (-2.526143667, -21.377245074), (-2.270091177, -21.390245202), (-1.504678093, -21.422241656), (-0.998061782, -21.434233714), (-0.495191246, -21.43696511), (0.003847391, -21.430513869), (0.498968576, -21.414957797), (0.990087332, -21.390374479), (1.477119251, -21.356841278), (1.959980499, -21.314435339), (2.438587816, -21.263233582), (2.912858513, -21.203312709), (3.382710474, -21.134749199), (3.848062156, -21.057619313), (4.769603018, -20.886378864), (5.225792085, -20.792267507), (5.67731905, -20.689741164), (6.124103702, -20.578875315), (6.566066349, -20.459744782), (7.003127825, -20.332423722), (7.435209485, -20.19698563), (7.862233207, -20.053503339), (8.28412139, -19.90204902), (8.70079696, -19.74269418), (9.112183361, -19.575509665), (9.518204562, -19.400565658), (10.119075303, -19.12661469), (10.318005296, -19.033375084), (10.51556558, -18.938221503), (10.711746711, -18.841162523), (10.906539263, -18.742206662), (11.099933819, -18.64136237), (11.29192098, -18.538638038), (11.482491359, -18.434041992), (11.671635584, -18.327582497), (11.859344295, -18.219267753), (12.04560815, -18.1091059), (12.230417816, -17.997105011), (12.505437058, -17.826357147), (12.596744258, -17.768983474), (12.687684411, -17.711153061), (12.778256351, -17.652866887), (12.868458909, -17.594125932), (12.95829092, -17.534931172), (13.047751217, -17.47528359), (13.136838631, -17.41518416), (13.225551998, -17.354633864), (13.313890149, -17.293633679), (13.401851919, -17.232184585), (13.489436139, -17.17028756), (13.59844302, -17.09235759), (13.620220726, -17.076743658), (13.641974744, -17.061101806), (13.663705056, -17.045432045), (13.685411644, -17.029734393), (13.707094488, -17.014008863), (13.728753571, -16.998255471), (13.750388875, -16.982474231), (13.772000381, -16.966665159), (13.793588071, -16.950828268), (13.815151927, -16.934963575), (13.836691931, -16.919071093), (13.86089758, -16.901160806), (13.863586724, -16.89917034), (13.866275494, -16.89717944), (13.868963892, -16.895188106), (13.871651916, -16.893196339), (13.874339568, -16.891204137), (13.877026846, -16.889211502), (13.879713751, -16.887218433), (13.882400283, -16.88522493), (13.885086441, -16.883230994), (13.887772226, -16.881236624), (13.890457638, -16.87924182), (13.894485196, -16.876248964), (13.895827622, -16.875251236), (13.897169954, -16.874253401), (13.898512194, -16.873255457), (13.899854339, -16.872257405), (13.901196392, -16.871259244), (13.902538351, -16.870260975), (13.903880217, -16.869262597), (13.905221989, -16.868264111), (13.906563668, -16.867265517), (13.907905254, -16.866266814), (13.909246746, -16.865268003), (13.911258844, -16.863769624), (13.91192952, -16.863270137), (13.912600173, -16.862770623), (13.913270802, -16.862271082), (13.913941408, -16.861771514), (13.914611991, -16.861271919), (13.91528255, -16.860772297), (13.915953086, -16.860272647), (13.916623599, -16.859772971), (13.917294088, -16.859273267), (13.917964554, -16.858773537), (13.918634997, -16.858273779), (13.919640625, -16.857524102), (13.919975829, -16.857274202), (13.920311027, -16.857024297), (13.920646219, -16.856774384), (13.920981405, -16.856524464), (13.921316586, -16.856274538), (13.92165176, -16.856024605), (13.921986929, -16.855774665), (13.922322092, -16.855524719), (13.922657249, -16.855274765), (13.9229924, -16.855024805), (13.923327546, -16.854774838), (13.923830255, -16.854399878), (13.923992275, -16.854279026), (13.924297546, -16.854051334), (13.92410082, -16.854198063), (13.924981362, -16.853541283), (13.924212736, -16.85411459), (13.925334235, -16.853278077), (13.924808534, -16.853670192), (13.925371285, -16.853250442), (13.925399495, -16.853229401), (13.925614179, -16.853069271), (13.925786988, -16.852940375), (13.926141857, -16.852675683), (13.926319291, -16.852543337), (13.926496725, -16.852410991), (13.92667416, -16.852278645), (13.926851594, -16.852146299), (13.927029028, -16.852013954), (13.927206462, -16.851881608), (13.927383897, -16.851749262), (13.927561331, -16.851616916), (13.927738765, -16.85148457), (13.9279162, -16.851352224), (13.928093634, -16.851219878), (13.933948965, -16.846852463), (13.939626862, -16.842617393), (13.945304759, -16.838382324), (13.950982656, -16.834147254), (13.956660553, -16.829912185), (13.96233845, -16.825677115), (13.968016347, -16.821442046), (13.973694244, -16.817206976), (13.979372141, -16.812971907), (13.985050038, -16.808736837), (13.990727935, -16.804501767), (13.996405832, -16.800266698), (14.013439523, -16.787561489), (14.024795317, -16.77909135), (14.036151111, -16.770621211), (14.047506905, -16.762151072), (14.058862699, -16.753680933), (14.070218493, -16.745210794), (14.081574286, -16.736740655), (14.092930081, -16.728270516), (14.104285874, -16.719800377), (14.115641668, -16.711330238), (14.126997462, -16.702860099), (14.138353256, -16.69438996), (14.195132226, -16.652039265), (14.240555402, -16.618158709), (14.285978578, -16.584278152), (14.331401754, -16.550397596), (14.37682493, -16.51651704), (14.422248105, -16.482636484), (14.467671281, -16.448755928), (14.513094457, -16.414875372), (14.558517633, -16.380994816), (14.603940809, -16.347114259), (14.649363985, -16.313233703), (14.69478716, -16.279353147), (14.740210336, -16.245472591)],
                knots=[-0.029579402, -0.029579402, -0.029579402, -0.029579402, -0.029579402, -0.029579402, -0.029579402, -0.029579402, -0.029579402, -0.029579402, -0.029579402, -0.029579402, -0.029579402, -0.029579402, -0.01170185, -0.01170185, -0.01170185, -0.01170185, -0.01170185, -0.01170185, -0.01170185, -0.01170185, -0.01170185, -0.01170185, -0.01170185, -0.01170185, -0.002763073, -0.002763073, -0.002763073, -0.002763073, -0.002763073, -0.002763073, -0.002763073, -0.002763073, -0.002763073, -0.002763073, -0.002763073, -0.002763073, -0.000528379, -0.000528379, -0.000528379, -0.000528379, -0.000528379, -0.000528379, -0.000528379, -0.000528379, -0.000528379, -0.000528379, -0.000528379, -0.000528379, -0.000249042, -0.000249042, -0.000249042, -0.000249042, -0.000249042, -0.000249042, -0.000249042, -0.000249042, -0.000249042, -0.000249042, -0.000249042, -0.000249042, -0.000109374, -0.000109374, -0.000109374, -0.000109374, -0.000109374, -0.000109374, -0.000109374, -0.000109374, -0.000109374, -0.000109374, -0.000109374, -0.000109374, -3.954e-05, -3.954e-05, -3.954e-05, -3.954e-05, -3.954e-05, -3.954e-05, -3.954e-05, -3.954e-05, -3.954e-05, -3.954e-05, -3.954e-05, -3.954e-05, -4.623e-06, -4.623e-06, -4.623e-06, -4.623e-06, -4.623e-06, -4.623e-06, -4.623e-06, -4.623e-06, -4.623e-06, -4.623e-06, -4.623e-06, -4.623e-06, 3.0294e-05, 3.0294e-05, 3.0294e-05, 3.0294e-05, 3.0294e-05, 3.0294e-05, 3.0294e-05, 3.0294e-05, 3.0294e-05, 3.0294e-05, 3.0294e-05, 3.0294e-05, 0.000588968, 0.000588968, 0.000588968, 0.000588968, 0.000588968, 0.000588968, 0.000588968, 0.000588968, 0.000588968, 0.000588968, 0.000588968, 0.000588968, 0.001706315, 0.001706315, 0.001706315, 0.001706315, 0.001706315, 0.001706315, 0.001706315, 0.001706315, 0.001706315, 0.001706315, 0.001706315, 0.001706315, 0.006175703, 0.006175703, 0.006175703, 0.006175703, 0.006175703, 0.006175703, 0.006175703, 0.006175703, 0.006175703, 0.006175703, 0.006175703, 0.006175703, 0.041930809, 0.041930809, 0.041930809, 0.041930809, 0.041930809, 0.041930809, 0.041930809, 0.041930809, 0.041930809, 0.041930809, 0.041930809, 0.041930809, 0.11344102, 0.11344102, 0.11344102, 0.11344102, 0.11344102, 0.11344102, 0.11344102, 0.11344102, 0.11344102, 0.11344102, 0.11344102, 0.11344102, 0.256461442, 0.256461442, 0.256461442, 0.256461442, 0.256461442, 0.256461442, 0.256461442, 0.256461442, 0.256461442, 0.256461442, 0.256461442, 0.256461442, 0.399481864, 0.399481864, 0.399481864, 0.399481864, 0.399481864, 0.399481864, 0.399481864, 0.399481864, 0.399481864, 0.399481864, 0.399481864, 0.399481864, 0.470992075, 0.470992075, 0.470992075, 0.470992075, 0.470992075, 0.470992075, 0.470992075, 0.470992075, 0.470992075, 0.470992075, 0.470992075, 0.470992075, 0.50674718, 0.50674718, 0.50674718, 0.50674718, 0.50674718, 0.50674718, 0.50674718, 0.50674718, 0.50674718, 0.50674718, 0.50674718, 0.50674718, 0.515685957, 0.515685957, 0.515685957, 0.515685957, 0.515685957, 0.515685957, 0.515685957, 0.515685957, 0.515685957, 0.515685957, 0.515685957, 0.515685957, 0.516803304, 0.516803304, 0.516803304, 0.516803304, 0.516803304, 0.516803304, 0.516803304, 0.516803304, 0.516803304, 0.516803304, 0.516803304, 0.516803304, 0.517361977, 0.517361977, 0.517361977, 0.517361977, 0.517361977, 0.517361977, 0.517361977, 0.517361977, 0.517361977, 0.517361977, 0.517361977, 0.517361977, 0.517641314, 0.517641314, 0.517641314, 0.517641314, 0.517641314, 0.517641314, 0.517641314, 0.517641314, 0.517641314, 0.517641314, 0.517641314, 0.517641314, 0.517780983, 0.517780983, 0.517780983, 0.517780983, 0.517780983, 0.517780983, 0.517780983, 0.517780983, 0.517780983, 0.517780983, 0.517780983, 0.517780983, 0.517850817, 0.517850817, 0.517850817, 0.517850817, 0.517850817, 0.517850817, 0.517850817, 0.517850817, 0.517850817, 0.517850817, 0.517850817, 0.517850817, 0.517920651, 0.517920651, 0.517920651, 0.517920651, 0.517920651, 0.517920651, 0.517920651, 0.517920651, 0.517920651, 0.517920651, 0.517920651, 0.517920651, 0.520155345, 0.520155345, 0.520155345, 0.520155345, 0.520155345, 0.520155345, 0.520155345, 0.520155345, 0.520155345, 0.520155345, 0.520155345, 0.520155345, 0.524624733, 0.524624733, 0.524624733, 0.524624733, 0.524624733, 0.524624733, 0.524624733, 0.524624733, 0.524624733, 0.524624733, 0.524624733, 0.524624733, 0.542502286, 0.542502286, 0.542502286, 0.542502286, 0.542502286, 0.542502286, 0.542502286, 0.542502286, 0.542502286, 0.542502286, 0.542502286, 0.542502286, 0.542502286, 0.542502286], degree=13))
            Line((14.740210336, -16.245472591), (16.500158977, -17.809749305))
            ThreePointArc((16.500158977, -17.809749305), (17.383977283, -15.451218425), (19.622532896, -14.296804513))
        make_face()
    extrude(amount=SHELL1_DEPTH, mode=Mode.SUBTRACT)

    # Sketch3 → Cut-Extrude1 (cut, up to next)
    with BuildSketch(Plane.XY.offset(7.5), mode=Mode.PRIVATE) as cut_extrude1_sk1:
        Circle(SKETCH3_R)
    cut_extrude1_tool1 = extrude(cut_extrude1_sk1.sketch, amount=-CUT_EXTRUDE1_REACH, mode=Mode.PRIVATE) & part.part
    add(cut_extrude1_tool1.solids().sort_by_distance((0, 0, 7.5))[0], mode=Mode.SUBTRACT)

    # Fillet1
    fillet1_edges = [part.edges().sort_by_distance(p)[0] for p in [
        (-22.191609365, 14.907863751, 0),
        (-17.186614263, 20.092270255, 0),
        (19.673138844, -12.669397979, 3.75),
        (14.671105933, -17.856437337, 3.75),
        (-7.7, -21.934994614, 3.75),
    ]]
    fillet(fillet1_edges, radius=FILLET1_R)


solid = part.part
